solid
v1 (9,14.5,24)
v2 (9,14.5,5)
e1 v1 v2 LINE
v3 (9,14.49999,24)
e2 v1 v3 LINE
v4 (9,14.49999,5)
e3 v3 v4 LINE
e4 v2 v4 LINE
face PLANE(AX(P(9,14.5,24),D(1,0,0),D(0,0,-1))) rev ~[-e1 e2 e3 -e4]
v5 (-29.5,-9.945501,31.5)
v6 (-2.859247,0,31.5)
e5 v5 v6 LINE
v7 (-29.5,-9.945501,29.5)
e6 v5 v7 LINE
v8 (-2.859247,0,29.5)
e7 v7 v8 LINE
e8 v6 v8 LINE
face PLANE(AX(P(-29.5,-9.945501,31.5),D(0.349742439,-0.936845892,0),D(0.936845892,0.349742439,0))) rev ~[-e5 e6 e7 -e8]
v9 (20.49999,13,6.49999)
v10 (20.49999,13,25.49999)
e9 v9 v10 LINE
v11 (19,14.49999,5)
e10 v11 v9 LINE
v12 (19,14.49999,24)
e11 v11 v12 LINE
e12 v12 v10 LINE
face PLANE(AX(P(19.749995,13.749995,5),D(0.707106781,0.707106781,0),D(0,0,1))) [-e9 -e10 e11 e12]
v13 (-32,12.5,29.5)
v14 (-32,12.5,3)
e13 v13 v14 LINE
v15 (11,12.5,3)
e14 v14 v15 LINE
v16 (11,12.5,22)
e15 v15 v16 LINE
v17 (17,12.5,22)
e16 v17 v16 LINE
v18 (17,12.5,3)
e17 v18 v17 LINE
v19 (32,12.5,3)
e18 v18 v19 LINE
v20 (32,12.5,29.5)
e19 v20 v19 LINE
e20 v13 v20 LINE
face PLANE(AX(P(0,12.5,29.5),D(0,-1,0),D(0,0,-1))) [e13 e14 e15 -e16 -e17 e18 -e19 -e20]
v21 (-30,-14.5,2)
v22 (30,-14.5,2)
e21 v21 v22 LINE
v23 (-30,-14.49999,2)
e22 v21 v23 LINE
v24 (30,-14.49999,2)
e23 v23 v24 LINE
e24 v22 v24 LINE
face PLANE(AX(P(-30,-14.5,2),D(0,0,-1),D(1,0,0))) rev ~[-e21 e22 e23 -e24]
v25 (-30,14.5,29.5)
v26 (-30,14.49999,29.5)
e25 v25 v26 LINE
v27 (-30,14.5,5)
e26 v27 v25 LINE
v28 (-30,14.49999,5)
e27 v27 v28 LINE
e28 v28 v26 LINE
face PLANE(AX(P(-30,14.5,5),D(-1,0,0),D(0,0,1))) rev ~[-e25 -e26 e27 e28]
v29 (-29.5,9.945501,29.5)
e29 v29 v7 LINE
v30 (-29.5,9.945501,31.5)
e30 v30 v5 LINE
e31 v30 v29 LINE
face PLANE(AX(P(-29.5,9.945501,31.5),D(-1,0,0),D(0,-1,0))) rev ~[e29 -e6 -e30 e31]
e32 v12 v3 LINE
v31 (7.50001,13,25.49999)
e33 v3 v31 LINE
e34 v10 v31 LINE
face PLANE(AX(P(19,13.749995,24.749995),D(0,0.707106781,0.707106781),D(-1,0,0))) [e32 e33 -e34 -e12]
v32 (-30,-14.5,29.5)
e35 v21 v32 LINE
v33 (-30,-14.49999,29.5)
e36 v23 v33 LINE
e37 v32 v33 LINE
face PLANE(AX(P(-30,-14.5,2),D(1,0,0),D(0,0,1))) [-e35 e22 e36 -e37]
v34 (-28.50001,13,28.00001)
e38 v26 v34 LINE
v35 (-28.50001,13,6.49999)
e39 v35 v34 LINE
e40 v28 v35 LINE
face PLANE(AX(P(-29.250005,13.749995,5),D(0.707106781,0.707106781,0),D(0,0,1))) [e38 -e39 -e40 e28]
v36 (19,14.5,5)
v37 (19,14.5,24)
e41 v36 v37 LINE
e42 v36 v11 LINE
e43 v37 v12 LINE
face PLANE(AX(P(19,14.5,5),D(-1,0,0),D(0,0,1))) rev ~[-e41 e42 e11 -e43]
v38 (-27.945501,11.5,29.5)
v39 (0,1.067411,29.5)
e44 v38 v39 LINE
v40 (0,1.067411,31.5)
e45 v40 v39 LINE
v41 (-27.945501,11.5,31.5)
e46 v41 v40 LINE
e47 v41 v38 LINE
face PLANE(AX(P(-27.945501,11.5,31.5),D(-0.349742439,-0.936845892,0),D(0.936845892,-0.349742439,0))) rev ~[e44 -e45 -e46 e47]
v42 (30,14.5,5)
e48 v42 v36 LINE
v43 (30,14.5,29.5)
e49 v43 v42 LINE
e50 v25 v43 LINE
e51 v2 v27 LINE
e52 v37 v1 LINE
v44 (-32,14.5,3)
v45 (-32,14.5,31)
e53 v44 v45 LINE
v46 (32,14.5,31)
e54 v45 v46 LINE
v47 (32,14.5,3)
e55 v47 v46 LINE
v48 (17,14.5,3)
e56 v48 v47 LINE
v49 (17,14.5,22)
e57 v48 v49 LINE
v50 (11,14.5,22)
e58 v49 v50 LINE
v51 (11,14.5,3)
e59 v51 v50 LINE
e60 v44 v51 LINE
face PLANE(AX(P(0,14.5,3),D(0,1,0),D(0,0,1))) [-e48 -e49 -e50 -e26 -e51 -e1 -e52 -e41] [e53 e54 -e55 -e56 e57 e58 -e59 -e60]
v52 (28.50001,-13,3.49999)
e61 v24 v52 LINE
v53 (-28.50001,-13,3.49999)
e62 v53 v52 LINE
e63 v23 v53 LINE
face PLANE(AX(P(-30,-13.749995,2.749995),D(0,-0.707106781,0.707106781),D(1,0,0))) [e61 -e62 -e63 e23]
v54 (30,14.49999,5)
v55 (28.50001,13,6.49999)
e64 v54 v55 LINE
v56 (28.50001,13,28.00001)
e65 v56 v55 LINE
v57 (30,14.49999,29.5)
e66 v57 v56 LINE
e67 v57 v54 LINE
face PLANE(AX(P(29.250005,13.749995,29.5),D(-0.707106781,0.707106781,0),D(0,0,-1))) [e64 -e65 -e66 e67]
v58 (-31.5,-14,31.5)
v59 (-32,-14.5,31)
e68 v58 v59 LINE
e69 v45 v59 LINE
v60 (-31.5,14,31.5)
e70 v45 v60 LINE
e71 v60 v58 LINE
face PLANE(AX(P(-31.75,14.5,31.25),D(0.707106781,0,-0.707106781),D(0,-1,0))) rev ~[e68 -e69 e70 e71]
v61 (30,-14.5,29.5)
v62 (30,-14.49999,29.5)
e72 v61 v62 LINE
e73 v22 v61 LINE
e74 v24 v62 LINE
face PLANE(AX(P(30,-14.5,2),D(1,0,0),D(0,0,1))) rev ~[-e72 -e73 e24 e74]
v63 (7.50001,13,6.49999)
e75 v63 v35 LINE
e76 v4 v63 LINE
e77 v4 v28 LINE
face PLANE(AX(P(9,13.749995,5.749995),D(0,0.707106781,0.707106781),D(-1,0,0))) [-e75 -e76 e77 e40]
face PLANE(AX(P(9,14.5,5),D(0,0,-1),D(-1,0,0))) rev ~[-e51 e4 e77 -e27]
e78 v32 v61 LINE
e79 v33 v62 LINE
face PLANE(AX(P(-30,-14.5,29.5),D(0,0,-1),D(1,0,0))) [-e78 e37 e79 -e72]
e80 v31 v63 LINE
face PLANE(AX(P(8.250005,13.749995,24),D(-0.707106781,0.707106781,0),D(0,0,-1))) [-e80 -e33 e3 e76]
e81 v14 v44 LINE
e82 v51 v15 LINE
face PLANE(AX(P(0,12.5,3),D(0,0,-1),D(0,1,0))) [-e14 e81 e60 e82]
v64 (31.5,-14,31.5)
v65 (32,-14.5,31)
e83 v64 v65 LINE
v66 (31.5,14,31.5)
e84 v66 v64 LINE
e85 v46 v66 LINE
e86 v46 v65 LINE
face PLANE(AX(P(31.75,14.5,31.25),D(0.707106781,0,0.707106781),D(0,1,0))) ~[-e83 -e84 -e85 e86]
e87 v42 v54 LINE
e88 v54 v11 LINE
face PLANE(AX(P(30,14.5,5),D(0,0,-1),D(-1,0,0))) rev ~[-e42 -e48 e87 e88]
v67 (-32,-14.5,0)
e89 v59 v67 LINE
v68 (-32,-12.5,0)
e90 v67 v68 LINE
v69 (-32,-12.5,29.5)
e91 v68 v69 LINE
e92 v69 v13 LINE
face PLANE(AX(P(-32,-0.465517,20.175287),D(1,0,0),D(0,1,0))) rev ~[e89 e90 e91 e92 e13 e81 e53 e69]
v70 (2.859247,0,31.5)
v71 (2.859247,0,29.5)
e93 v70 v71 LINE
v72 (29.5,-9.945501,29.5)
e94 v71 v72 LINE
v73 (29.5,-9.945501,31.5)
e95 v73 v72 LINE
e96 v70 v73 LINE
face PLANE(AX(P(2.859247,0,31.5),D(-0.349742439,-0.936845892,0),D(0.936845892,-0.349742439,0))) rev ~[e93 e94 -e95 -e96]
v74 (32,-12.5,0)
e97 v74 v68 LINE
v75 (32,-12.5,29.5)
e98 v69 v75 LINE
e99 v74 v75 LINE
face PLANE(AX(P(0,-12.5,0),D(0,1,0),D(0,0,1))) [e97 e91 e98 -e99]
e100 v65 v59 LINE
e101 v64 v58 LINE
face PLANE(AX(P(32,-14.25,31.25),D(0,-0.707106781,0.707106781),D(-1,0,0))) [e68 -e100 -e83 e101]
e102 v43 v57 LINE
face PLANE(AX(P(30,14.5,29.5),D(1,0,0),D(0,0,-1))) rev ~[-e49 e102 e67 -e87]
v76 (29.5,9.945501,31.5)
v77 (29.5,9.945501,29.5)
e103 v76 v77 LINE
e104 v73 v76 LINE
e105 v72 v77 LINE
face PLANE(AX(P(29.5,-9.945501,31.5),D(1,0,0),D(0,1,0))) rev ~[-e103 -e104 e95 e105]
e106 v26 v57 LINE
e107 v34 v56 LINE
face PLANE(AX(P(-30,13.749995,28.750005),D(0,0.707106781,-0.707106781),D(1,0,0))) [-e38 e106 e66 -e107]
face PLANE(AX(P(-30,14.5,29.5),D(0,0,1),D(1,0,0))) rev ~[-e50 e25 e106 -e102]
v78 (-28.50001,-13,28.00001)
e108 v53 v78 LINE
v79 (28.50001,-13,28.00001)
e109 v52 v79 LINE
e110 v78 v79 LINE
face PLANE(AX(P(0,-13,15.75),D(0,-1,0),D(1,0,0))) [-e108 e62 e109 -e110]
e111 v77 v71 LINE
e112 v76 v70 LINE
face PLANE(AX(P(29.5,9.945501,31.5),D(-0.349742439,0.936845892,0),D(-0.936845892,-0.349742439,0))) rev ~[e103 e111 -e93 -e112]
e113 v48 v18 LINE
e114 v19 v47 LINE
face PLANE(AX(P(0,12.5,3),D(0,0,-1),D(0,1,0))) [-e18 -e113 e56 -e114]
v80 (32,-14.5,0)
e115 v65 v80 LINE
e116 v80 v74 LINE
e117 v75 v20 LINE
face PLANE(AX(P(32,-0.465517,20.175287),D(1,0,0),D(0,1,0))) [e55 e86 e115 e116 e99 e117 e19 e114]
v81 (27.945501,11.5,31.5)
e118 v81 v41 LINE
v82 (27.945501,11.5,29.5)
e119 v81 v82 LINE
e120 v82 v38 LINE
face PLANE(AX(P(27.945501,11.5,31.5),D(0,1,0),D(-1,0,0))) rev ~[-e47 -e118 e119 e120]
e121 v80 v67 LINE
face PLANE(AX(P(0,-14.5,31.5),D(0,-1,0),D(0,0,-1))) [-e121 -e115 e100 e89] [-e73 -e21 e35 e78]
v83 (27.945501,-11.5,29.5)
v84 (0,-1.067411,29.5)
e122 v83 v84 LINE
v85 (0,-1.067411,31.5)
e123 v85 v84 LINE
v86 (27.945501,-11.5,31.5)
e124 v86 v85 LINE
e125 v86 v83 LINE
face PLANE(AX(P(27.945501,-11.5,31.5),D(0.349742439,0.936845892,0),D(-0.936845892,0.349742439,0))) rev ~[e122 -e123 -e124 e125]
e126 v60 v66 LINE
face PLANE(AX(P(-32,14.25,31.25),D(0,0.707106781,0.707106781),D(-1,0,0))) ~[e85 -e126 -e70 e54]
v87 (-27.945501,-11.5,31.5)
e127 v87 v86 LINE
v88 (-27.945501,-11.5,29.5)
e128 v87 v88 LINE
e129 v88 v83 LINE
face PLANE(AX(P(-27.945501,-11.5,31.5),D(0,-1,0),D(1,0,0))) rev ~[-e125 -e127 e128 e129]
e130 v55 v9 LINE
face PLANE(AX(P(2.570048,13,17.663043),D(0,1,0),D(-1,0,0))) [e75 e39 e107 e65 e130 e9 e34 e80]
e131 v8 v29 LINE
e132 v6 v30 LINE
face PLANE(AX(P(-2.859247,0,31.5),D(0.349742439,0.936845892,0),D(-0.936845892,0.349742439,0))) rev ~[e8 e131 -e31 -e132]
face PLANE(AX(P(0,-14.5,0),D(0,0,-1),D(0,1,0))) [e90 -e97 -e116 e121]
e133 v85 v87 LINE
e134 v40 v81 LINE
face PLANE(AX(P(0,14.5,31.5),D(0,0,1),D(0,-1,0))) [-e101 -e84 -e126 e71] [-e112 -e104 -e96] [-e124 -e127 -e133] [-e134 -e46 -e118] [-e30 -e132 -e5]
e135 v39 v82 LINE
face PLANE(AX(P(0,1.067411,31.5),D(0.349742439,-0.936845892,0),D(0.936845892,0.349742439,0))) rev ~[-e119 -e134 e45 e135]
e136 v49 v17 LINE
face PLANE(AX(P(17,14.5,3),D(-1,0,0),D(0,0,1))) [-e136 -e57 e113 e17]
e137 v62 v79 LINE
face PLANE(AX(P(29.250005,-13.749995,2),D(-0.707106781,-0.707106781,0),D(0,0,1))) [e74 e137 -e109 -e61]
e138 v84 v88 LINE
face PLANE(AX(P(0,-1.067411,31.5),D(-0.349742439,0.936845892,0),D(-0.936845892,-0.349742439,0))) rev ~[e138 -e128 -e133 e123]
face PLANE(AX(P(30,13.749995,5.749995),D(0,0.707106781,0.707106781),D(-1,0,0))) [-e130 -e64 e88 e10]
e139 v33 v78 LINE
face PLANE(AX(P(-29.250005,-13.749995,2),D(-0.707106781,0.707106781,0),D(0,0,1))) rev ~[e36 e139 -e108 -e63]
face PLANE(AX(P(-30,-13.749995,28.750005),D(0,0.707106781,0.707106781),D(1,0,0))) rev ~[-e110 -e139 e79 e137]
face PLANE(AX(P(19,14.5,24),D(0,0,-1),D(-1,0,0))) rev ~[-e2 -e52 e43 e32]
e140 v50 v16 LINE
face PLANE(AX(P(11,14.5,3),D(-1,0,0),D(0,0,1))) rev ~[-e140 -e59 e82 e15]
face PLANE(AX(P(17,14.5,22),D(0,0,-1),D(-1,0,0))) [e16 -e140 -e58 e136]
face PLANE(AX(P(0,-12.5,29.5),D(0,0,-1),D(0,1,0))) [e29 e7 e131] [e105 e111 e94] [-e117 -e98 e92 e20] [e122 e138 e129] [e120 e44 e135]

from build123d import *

# Parameters (mm, degrees)
F1_DEPTH  = 32
F3_DEPTH  = 1.5
F2_W      = 6
F2_H      = 19
F4_DEPTH  = 2
F5_W      = 60
F5_H      = 27.5
F6_DEPTH  = 1.5
F7_SIZE   = 1.49999
F8_SIZE   = 0.5
F10_DEPTH = 2


# Not quite as in the source:
# - a fillet or chamfer is up to 0.001 mm smaller than in the source, because OpenCascade refuses the exact size


with BuildPart() as f1:
    # F0 (on Right) → F1 (new body, symmetric)
    with BuildSketch(Plane.YZ):
        Polygon((-12.5, 0), (-12.5, 29.5), (12.5, 29.5), (12.5, 3), (14.5, 3), (14.5, 31.5), (-14.5, 31.5), (-14.5, 0), align=None)
    extrude(amount=F1_DEPTH, both=True)

    # F2 (on face) → F3 (cut)
    with BuildSketch(Plane(origin=(0, 14.5, 0), x_dir=(-1, 0, 0), z_dir=(0, 1, 0))):
        Polygon((-9, 5), (30, 5), (30, 29.5), (-30, 29.5), (-30, 5), (-19, 5), (-19, 24), (-9, 24), align=None)
    extrude(amount=-F3_DEPTH, mode=Mode.SUBTRACT)

    # F2 (on face) → F4 (cut)
    with BuildSketch(Plane(origin=(0, 14.5, 0), x_dir=(-1, 0, 0), z_dir=(0, 1, 0))):
        with Locations((-14, 12.5)):
            Rectangle(F2_W, F2_H)
    extrude(amount=-F4_DEPTH, mode=Mode.SUBTRACT)

    # F5 (on face) → F6 (cut)
    with BuildSketch(Plane.XZ.offset(14.5)):
        with Locations((0, 15.75)):
            Rectangle(F5_W, F5_H)
    extrude(amount=-F6_DEPTH, mode=Mode.SUBTRACT)

    # F7 (size 1.5 in the source; OpenCascade refuses exactly that, so slightly less here)
    f7_edges = [f1.edges().sort_by_distance(p)[0] for p in [
        (-30, 13, 17.25),
        (0, 13, 29.5),
        (30, 13, 17.25),
        (9, 13, 14.5),
        (-10.5, 13, 5),
        (24.5, 13, 5),
        (19, 13, 14.5),
        (14, 13, 24),
        (0, -13, 29.5),
        (-30, -13, 15.75),
        (0, -13, 2),
        (30, -13, 15.75),
    ]]
    chamfer(f7_edges, length=F7_SIZE)

    # F8
    f8_edges = [f1.edges().sort_by_distance(p)[0] for p in [
        (0, 14.5, 31.5),
        (0, -14.5, 31.5),
        (32, 0, 31.5),
        (-32, 0, 31.5),
    ]]
    chamfer(f8_edges, length=F8_SIZE)

    # F9 (on face) → F10 (cut)
    with BuildSketch(Plane.XY.offset(31.5)):
        Polygon((27.9455012138, 11.5), (-27.9455012138, 11.5), (0, 1.0674114154), align=None)
        Polygon((-2.8592469416, 0), (-29.5, 9.9455012138), (-29.5, -9.9455012138), align=None)
        Polygon((0, -1.0674114154), (-27.9455012138, -11.5), (27.9455012138, -11.5), align=None)
        Polygon((29.5, -9.9455012138), (29.5, 9.9455012138), (2.8592469416, 0), align=None)
    extrude(amount=-F10_DEPTH, mode=Mode.SUBTRACT)


solid = f1.part
